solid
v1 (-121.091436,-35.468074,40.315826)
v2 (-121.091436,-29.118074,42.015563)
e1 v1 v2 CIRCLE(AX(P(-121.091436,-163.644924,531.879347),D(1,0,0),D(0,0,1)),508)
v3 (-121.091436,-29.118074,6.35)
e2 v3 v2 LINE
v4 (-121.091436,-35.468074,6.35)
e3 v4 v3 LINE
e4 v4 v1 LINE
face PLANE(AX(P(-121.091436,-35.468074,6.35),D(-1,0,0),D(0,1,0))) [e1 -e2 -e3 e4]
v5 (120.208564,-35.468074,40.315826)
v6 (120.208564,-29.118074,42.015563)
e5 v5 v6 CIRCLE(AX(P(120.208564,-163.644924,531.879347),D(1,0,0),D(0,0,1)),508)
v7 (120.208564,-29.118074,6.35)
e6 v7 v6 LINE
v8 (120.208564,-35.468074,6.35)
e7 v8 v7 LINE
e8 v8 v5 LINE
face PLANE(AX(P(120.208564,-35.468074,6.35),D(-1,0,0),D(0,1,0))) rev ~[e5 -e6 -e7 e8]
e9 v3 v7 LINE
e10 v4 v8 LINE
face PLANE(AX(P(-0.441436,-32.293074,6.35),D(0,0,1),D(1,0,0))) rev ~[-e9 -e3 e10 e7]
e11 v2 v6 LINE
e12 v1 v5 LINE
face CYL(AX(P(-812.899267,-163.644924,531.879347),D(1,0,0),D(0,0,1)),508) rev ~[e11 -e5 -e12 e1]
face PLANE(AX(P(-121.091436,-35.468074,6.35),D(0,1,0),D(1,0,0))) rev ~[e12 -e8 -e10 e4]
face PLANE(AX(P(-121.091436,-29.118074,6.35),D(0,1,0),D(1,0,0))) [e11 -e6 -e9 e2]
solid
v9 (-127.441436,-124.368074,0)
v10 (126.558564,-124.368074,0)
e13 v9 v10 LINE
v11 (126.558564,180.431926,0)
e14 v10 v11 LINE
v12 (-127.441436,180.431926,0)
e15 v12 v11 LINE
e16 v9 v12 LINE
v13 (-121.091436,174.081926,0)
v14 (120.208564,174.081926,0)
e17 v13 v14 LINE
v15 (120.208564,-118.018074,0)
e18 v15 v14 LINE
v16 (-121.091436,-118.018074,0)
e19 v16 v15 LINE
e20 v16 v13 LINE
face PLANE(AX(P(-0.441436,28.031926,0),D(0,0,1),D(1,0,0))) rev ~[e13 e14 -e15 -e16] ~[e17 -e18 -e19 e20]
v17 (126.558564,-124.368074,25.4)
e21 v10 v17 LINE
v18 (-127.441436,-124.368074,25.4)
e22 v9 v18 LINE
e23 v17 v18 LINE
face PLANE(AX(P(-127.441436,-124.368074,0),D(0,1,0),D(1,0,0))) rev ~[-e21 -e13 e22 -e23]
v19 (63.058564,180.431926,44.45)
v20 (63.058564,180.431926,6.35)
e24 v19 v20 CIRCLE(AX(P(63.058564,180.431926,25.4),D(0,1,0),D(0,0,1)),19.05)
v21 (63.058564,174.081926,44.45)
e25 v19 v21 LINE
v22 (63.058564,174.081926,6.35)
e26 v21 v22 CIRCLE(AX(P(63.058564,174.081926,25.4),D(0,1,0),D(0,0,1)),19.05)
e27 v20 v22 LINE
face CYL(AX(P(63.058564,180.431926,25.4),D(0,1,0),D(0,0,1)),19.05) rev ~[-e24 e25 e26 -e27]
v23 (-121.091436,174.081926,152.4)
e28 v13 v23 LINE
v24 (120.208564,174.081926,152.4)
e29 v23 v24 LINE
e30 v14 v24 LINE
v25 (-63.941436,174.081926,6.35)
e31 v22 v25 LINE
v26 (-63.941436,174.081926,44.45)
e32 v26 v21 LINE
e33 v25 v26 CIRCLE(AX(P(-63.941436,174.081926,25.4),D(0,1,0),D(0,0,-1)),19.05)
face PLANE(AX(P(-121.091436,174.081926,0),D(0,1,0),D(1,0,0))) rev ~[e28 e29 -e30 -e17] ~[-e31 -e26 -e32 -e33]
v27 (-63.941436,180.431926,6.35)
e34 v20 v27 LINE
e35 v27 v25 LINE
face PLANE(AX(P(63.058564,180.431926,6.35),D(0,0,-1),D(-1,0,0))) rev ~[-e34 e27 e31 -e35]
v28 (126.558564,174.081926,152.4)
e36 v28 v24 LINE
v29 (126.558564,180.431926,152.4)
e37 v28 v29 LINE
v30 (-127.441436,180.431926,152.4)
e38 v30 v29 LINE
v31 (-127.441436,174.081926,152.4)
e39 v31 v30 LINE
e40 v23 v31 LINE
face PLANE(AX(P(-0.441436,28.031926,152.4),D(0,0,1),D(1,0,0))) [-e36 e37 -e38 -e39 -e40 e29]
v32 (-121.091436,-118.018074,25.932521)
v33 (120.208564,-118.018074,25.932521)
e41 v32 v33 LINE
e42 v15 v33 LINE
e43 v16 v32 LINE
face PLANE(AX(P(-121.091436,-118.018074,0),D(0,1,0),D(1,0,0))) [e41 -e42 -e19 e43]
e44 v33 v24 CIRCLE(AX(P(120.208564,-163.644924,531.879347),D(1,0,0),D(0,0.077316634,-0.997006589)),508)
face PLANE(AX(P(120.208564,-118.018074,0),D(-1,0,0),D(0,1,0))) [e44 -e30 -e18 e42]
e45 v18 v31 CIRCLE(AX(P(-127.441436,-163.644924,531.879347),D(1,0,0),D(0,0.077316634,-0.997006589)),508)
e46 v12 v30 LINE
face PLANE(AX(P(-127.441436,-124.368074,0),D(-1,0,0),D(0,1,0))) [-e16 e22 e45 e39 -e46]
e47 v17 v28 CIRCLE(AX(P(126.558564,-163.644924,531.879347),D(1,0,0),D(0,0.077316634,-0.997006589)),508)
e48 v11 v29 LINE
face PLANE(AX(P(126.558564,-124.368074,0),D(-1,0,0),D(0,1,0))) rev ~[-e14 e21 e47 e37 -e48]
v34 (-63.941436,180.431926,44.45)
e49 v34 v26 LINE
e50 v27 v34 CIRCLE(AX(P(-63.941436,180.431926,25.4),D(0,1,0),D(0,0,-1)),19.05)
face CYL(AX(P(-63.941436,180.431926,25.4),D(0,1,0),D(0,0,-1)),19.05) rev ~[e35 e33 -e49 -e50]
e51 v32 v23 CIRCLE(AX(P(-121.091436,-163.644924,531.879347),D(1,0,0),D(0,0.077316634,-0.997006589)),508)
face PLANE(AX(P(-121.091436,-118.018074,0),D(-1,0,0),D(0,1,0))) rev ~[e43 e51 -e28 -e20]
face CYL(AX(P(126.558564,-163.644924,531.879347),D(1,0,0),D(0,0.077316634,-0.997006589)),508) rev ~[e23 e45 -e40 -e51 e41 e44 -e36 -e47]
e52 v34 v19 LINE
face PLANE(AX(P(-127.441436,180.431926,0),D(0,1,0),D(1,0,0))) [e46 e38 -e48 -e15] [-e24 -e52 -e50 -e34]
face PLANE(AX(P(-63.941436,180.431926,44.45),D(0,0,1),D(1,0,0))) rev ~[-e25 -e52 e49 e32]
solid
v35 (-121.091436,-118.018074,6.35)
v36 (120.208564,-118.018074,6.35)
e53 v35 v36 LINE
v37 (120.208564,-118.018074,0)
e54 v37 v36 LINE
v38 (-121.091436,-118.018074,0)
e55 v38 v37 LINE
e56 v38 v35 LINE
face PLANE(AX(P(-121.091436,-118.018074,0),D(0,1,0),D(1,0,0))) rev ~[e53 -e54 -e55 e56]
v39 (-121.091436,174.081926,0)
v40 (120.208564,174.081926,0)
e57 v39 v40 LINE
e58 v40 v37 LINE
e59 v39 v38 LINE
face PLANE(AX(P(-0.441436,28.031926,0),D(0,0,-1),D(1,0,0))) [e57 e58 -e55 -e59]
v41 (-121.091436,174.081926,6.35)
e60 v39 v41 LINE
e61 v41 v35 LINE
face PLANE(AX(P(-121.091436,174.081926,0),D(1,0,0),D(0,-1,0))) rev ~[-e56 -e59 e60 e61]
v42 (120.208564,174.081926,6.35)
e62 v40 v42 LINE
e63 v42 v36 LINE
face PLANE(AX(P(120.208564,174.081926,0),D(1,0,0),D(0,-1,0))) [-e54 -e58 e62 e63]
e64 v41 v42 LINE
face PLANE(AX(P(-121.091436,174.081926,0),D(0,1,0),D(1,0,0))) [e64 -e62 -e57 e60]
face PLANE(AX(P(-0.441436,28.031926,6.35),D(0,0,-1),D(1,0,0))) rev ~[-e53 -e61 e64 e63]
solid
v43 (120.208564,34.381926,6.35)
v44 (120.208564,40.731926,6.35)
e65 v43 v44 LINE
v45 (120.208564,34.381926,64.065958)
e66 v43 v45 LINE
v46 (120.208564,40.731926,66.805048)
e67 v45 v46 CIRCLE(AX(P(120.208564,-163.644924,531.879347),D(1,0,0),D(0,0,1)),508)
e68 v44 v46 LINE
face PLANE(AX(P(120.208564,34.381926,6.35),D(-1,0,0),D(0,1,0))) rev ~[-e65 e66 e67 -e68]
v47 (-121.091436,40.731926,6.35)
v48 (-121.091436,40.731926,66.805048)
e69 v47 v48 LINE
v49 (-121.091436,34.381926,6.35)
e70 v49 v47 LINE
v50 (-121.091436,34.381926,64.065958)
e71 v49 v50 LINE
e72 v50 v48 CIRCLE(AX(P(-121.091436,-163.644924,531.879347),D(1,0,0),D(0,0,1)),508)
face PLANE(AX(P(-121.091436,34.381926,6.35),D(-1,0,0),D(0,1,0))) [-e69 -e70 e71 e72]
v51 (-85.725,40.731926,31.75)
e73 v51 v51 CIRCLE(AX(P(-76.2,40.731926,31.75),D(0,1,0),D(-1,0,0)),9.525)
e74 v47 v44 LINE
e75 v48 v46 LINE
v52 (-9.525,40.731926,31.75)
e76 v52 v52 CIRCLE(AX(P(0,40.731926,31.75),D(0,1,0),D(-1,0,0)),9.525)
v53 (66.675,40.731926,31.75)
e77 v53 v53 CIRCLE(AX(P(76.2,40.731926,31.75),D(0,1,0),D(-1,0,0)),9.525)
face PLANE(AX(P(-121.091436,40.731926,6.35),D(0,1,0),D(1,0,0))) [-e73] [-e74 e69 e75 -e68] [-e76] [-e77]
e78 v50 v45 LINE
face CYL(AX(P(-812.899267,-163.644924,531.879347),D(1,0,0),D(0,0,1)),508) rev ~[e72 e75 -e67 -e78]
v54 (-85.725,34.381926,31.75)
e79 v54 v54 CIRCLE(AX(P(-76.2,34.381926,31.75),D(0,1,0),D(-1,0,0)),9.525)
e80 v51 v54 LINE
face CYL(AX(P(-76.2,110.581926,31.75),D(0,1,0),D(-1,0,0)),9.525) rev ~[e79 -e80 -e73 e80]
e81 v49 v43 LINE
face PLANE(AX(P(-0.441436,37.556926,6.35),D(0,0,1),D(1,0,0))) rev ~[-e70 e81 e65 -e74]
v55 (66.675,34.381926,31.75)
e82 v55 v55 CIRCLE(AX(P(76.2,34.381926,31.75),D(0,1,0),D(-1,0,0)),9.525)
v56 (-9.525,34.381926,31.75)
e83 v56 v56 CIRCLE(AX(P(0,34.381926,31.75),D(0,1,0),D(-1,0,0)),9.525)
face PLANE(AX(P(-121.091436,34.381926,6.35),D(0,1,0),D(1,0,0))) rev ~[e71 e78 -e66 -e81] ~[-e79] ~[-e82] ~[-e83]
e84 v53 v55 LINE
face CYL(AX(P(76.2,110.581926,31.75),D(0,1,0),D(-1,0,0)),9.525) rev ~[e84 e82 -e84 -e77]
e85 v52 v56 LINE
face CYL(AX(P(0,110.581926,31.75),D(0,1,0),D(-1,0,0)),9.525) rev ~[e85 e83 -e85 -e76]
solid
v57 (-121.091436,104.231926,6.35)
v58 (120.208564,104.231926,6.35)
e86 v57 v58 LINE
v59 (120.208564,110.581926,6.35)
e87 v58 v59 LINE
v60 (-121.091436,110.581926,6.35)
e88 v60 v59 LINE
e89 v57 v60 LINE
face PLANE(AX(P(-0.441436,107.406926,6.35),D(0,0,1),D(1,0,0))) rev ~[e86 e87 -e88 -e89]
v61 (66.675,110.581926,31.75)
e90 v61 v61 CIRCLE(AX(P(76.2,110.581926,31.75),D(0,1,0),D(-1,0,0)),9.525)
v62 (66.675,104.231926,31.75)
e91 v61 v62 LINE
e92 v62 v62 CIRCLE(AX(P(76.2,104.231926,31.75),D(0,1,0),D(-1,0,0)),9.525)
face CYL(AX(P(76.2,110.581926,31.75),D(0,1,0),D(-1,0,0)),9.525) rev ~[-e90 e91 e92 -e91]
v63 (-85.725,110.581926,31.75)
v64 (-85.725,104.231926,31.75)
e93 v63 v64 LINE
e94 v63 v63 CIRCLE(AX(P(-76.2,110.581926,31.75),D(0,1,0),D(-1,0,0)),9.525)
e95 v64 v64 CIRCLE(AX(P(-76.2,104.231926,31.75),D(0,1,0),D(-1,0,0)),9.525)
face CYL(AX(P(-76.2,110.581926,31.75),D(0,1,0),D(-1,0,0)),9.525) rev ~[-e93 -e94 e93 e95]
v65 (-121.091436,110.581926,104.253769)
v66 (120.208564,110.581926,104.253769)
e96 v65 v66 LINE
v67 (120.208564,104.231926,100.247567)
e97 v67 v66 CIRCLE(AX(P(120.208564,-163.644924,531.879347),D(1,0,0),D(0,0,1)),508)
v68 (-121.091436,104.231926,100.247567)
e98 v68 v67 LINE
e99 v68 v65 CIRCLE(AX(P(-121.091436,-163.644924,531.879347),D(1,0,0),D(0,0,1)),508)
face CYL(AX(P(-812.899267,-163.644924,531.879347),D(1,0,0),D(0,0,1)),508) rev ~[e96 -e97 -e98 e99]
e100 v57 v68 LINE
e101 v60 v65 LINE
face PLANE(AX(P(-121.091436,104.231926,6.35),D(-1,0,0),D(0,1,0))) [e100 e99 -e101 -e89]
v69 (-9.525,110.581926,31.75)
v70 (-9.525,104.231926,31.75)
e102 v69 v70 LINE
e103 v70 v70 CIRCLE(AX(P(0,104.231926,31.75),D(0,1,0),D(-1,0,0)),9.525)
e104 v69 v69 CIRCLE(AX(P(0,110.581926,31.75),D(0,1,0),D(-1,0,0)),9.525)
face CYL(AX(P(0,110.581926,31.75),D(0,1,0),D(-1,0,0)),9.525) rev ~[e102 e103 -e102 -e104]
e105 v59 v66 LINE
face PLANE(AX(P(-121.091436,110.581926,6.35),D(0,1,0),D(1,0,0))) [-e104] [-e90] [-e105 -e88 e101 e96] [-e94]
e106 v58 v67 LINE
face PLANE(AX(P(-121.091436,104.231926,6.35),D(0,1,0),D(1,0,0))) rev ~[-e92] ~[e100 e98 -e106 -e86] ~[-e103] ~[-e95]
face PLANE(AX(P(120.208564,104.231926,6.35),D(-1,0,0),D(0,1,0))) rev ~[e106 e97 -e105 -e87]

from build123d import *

# Parameters (mm, degrees)
F0_W          = 254
F0_H          = 304.8
F0_W_2        = 241.3
F0_H_2        = 292.1
F1_DEPTH      = 152.4
F3_DEPTH      = 254
F4_W          = 241.3
F4_H          = 292.1
F5_DEPTH      = 6.35
F7_END_RADIUS = 508
F6_W          = 241.3
F6_H          = 6.35
F7_REACH      = 387.4345381711
F9_DEPTH      = 12.7
F10_R         = 9.525
F11_DEPTH     = 99.06
F12_R         = 9.525
F13_DEPTH     = 25.4


# Not quite as in the source:
# - a feature names something its author has since deleted; it is built from what else it names


with BuildPart() as f1:
    # F0 (on Top) → F1 (new body)
    with BuildSketch(Plane.XY):
        with Locations((-0.4414357245, 28.0319261778)):
            Rectangle(F0_W, F0_H)
        with Locations((-0.4414357245, 28.0319261778)):
            Rectangle(F0_W_2, F0_H_2, mode=Mode.SUBTRACT)
    extrude(amount=F1_DEPTH)

    # F2 (on face) → F3 (cut, through all)
    with BuildSketch(Plane.YZ.offset(126.5585642755)):
        with BuildLine():
            Line((-124.3680738222, 152.4), (-124.3680738222, 25.4))
            ThreePointArc((-124.3680738222, 25.4), (35.2650996978, 64.440792228), (174.0819261778, 152.4))
            Line((174.0819261778, 152.4), (-124.3680738222, 152.4))
        make_face()
    extrude(amount=-F3_DEPTH, mode=Mode.SUBTRACT)

    # F8 (on face) → F9 (cut)
    with BuildSketch(Plane(origin=(0, 180.4319261778, 0), x_dir=(-1, 0, 0), z_dir=(0, 1, 0))):
        with BuildLine():
            Line((63.9414357245, 44.45), (-63.0585642755, 44.45))
            ThreePointArc((-63.0585642755, 44.45), (-82.1085642755, 25.4), (-63.0585642755, 6.35))
            Line((-63.0585642755, 6.35), (63.9414357245, 6.35))
            ThreePointArc((63.9414357245, 6.35), (82.9914357245, 25.4), (63.9414357245, 44.45))
        make_face()
    extrude(amount=-F9_DEPTH, mode=Mode.SUBTRACT)

    # F12 (on face) → F13 (cut)
    with BuildSketch(Plane(origin=(0, 40.7319261778, 0), x_dir=(-1, 0, 0), z_dir=(0, 1, 0))):
        with Locations((0, 31.75)):
            Circle(F12_R)
        with Locations((-76.2, 31.75)):
            Circle(F12_R)
        with Locations((76.2, 31.75)):
            Circle(F12_R)
    extrude(amount=-F13_DEPTH, mode=Mode.SUBTRACT)


with BuildPart() as f5:
    # F4 (on face) → F5 (new body)
    with BuildSketch(Plane(origin=(0, 0, 0), x_dir=(1, 0, 0), z_dir=(0, 0, -1))):
        with Locations((-0.4414357245, -28.0319261778)):
            Rectangle(F4_W, F4_H)
    extrude(amount=-F5_DEPTH)


with BuildPart() as f7:
    f7_end = (Plane(origin=(-0.4414357245, -163.6449236636, 531.8793471273), x_dir=(0, 0, 1), z_dir=(1, 0, 0)) * Cylinder(F7_END_RADIUS, 1624.9156633008, mode=Mode.PRIVATE)).faces().sort_by_distance((122.4388870733, 35.2650996978, 64.440792228))[0]
    # F6 (on face) → F7 (new body, up to the whole of a round face its end follows)
    with BuildSketch(Plane.XY.offset(6.35)):
        with Locations((-0.4414357245, 37.5569261778)):
            Rectangle(F6_W, F6_H)
    f7_long = extrude(amount=F7_REACH, mode=Mode.PRIVATE)
    add(split(f7_long, bisect_by=f7_end, keep=Keep.TOP, mode=Mode.PRIVATE))


with BuildPart() as f7b:
    f7_2_end = (Plane(origin=(-0.4414357245, -163.6449236636, 531.8793471273), x_dir=(0, 0, 1), z_dir=(1, 0, 0)) * Cylinder(F7_END_RADIUS, 1624.9156633008, mode=Mode.PRIVATE)).faces().sort_by_distance((122.4388870733, 35.2650996978, 64.440792228))[0]
    # F6 (on face) → F7, piece 2 (new body, up to the whole of a round face its end follows)
    with BuildSketch(Plane.XY.offset(6.35)):
        with Locations((-0.4414357245, 107.4069261778)):
            Rectangle(F6_W, F6_H)
    f7_2_long = extrude(amount=F7_REACH, mode=Mode.PRIVATE)
    add(split(f7_2_long, bisect_by=f7_2_end, keep=Keep.TOP, mode=Mode.PRIVATE))


with BuildPart() as f7c:
    f7_3_end = (Plane(origin=(-0.4414357245, -163.6449236636, 531.8793471273), x_dir=(0, 0, 1), z_dir=(1, 0, 0)) * Cylinder(F7_END_RADIUS, 1624.9156633008, mode=Mode.PRIVATE)).faces().sort_by_distance((122.4388870733, 35.2650996978, 64.440792228))[0]
    # F6 (on face) → F7, piece 3 (new body, up to the whole of a round face its end follows)
    with BuildSketch(Plane.XY.offset(6.35)):
        with Locations((-0.4414357245, -32.2930738222)):
            Rectangle(F6_W, F6_H)
    f7_3_long = extrude(amount=F7_REACH, mode=Mode.PRIVATE)
    add(split(f7_3_long, bisect_by=f7_3_end, keep=Keep.TOP, mode=Mode.PRIVATE))


with BuildPart() as f11_tool:
    # F10 (on face) → F11 (new body)
    with BuildSketch(Plane(origin=(0, 110.5819261778, 0), x_dir=(-1, 0, 0), z_dir=(0, 1, 0))):
        with Locations((76.2, 31.75)):
            Circle(F10_R)
        with Locations((0, 31.75)):
            Circle(F10_R)
        with Locations((-76.2, 31.75)):
            Circle(F10_R)
    extrude(amount=-F11_DEPTH)


with BuildPart() as f7_1:
    add(f7.part)

    # F11: cut by f11_tool
    add(f11_tool.part, mode=Mode.SUBTRACT)


with BuildPart() as f7b_1:
    add(f7b.part)

    # F11: cut by f11_tool
    add(f11_tool.part, mode=Mode.SUBTRACT)


solid = Compound([f1.part, f5.part, f7c.part, f7_1.part, f7b_1.part])
